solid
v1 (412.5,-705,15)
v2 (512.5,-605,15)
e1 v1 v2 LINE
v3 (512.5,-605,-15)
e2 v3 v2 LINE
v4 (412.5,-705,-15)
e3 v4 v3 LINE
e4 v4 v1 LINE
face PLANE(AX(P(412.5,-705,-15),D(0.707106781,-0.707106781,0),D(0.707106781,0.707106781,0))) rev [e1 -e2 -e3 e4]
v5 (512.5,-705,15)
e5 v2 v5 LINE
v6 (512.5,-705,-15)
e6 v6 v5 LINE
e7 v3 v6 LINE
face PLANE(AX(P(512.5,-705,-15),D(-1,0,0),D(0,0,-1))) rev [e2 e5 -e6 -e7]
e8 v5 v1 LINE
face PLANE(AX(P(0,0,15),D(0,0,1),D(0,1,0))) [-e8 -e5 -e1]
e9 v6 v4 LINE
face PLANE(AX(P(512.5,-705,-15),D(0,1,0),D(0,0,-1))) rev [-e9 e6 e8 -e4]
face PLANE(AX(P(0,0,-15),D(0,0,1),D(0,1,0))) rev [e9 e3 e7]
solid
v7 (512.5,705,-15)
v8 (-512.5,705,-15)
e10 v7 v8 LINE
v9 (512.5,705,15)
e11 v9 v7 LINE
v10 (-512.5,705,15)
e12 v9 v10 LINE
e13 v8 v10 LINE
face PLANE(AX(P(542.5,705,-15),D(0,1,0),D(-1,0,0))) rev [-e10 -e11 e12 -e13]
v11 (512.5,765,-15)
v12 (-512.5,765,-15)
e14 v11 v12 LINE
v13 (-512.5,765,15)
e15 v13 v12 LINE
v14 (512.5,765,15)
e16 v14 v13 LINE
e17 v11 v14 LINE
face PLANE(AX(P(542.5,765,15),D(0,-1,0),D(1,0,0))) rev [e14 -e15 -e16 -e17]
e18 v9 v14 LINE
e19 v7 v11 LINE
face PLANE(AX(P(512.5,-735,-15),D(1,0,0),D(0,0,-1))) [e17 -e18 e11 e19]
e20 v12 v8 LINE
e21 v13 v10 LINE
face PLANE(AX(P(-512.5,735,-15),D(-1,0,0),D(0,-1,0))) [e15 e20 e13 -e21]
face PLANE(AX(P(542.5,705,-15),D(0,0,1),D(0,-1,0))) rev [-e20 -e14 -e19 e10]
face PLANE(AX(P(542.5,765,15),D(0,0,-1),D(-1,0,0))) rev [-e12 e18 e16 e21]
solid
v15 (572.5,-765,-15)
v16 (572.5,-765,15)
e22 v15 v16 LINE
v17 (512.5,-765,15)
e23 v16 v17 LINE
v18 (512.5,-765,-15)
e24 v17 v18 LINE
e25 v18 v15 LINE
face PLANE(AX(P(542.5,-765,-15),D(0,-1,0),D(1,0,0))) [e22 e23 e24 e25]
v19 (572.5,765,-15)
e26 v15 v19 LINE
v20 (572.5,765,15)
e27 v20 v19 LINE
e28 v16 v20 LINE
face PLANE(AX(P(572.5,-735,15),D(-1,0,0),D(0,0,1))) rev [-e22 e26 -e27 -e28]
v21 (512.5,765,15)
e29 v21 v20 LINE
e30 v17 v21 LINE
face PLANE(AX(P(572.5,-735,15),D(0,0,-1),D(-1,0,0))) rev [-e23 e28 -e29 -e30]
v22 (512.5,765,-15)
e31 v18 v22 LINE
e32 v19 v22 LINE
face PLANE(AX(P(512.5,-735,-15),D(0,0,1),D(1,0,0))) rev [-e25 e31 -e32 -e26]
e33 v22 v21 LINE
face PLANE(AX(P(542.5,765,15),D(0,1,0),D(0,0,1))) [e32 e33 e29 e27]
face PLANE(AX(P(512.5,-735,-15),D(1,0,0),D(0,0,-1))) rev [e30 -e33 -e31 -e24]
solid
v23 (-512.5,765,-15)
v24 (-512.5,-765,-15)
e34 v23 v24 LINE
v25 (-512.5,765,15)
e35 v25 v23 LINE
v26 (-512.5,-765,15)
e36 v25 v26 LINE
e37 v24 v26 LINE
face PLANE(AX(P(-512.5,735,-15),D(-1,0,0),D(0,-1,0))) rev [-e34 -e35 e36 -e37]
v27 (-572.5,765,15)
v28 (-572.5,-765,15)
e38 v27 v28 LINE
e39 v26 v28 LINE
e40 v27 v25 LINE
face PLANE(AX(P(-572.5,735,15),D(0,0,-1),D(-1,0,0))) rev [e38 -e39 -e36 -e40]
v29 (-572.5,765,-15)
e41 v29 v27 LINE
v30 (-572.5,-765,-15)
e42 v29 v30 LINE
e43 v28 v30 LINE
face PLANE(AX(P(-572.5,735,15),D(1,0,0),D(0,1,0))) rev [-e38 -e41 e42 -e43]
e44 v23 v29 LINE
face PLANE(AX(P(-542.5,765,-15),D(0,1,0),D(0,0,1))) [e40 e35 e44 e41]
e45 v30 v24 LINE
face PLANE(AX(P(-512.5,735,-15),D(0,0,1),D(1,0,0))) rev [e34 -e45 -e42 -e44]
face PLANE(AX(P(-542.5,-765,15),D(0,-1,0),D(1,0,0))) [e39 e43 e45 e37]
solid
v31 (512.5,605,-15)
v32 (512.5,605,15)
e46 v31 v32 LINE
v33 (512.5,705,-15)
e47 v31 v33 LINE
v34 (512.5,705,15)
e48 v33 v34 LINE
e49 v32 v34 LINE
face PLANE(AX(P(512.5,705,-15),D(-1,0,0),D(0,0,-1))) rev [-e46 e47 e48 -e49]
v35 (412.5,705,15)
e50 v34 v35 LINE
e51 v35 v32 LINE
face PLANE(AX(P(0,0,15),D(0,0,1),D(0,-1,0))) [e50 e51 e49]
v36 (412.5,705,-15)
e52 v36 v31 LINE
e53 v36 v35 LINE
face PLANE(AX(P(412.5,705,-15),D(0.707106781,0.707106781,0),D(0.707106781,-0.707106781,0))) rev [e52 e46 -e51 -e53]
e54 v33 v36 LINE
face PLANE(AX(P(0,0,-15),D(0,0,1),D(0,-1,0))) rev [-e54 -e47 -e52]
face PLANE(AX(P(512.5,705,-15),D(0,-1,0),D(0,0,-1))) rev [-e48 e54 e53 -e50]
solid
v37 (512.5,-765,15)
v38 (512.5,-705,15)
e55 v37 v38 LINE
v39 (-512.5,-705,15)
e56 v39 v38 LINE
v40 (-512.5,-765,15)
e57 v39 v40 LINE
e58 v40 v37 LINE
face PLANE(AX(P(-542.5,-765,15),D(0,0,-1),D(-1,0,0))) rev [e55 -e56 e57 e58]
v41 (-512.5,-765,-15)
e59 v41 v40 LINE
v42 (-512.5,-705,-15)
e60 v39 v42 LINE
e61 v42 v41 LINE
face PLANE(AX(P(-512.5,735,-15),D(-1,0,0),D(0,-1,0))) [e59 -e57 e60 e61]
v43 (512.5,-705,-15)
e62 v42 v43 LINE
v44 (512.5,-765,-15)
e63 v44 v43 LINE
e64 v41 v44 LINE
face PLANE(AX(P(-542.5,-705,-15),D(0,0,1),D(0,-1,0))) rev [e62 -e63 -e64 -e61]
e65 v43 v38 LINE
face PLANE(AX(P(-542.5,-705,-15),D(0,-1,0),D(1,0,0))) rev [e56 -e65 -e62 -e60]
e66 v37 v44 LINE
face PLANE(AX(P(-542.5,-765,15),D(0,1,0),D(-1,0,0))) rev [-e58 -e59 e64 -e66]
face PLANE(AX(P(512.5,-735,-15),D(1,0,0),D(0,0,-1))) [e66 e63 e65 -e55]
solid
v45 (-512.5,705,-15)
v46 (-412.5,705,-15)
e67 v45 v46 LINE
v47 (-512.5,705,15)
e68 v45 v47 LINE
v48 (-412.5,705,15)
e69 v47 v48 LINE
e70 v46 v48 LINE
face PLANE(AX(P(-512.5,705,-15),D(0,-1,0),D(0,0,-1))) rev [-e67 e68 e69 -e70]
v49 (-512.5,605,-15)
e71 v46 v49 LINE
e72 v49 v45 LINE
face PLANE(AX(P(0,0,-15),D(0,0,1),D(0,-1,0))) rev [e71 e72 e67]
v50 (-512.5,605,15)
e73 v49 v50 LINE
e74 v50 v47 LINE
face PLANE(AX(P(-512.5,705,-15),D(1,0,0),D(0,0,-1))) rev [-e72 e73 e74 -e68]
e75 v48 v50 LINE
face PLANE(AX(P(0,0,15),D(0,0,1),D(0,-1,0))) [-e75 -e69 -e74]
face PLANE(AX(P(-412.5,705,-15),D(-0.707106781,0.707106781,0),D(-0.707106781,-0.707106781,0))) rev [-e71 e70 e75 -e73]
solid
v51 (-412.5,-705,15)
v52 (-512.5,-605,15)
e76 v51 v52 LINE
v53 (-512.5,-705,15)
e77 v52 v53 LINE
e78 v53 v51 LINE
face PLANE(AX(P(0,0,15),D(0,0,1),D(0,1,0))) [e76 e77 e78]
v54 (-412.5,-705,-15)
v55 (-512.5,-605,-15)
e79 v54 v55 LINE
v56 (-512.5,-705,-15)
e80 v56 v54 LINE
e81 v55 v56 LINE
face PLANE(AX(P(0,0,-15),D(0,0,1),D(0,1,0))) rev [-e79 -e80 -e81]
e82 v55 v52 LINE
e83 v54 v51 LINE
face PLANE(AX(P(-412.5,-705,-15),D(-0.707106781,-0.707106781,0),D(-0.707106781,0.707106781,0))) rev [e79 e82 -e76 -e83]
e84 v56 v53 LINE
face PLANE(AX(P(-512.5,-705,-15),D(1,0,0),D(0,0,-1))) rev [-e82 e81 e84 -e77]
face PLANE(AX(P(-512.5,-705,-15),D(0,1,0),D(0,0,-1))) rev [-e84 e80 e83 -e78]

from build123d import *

# Parameters (mm, degrees)
MEMBER_START                 = -765
MEMBER_20_X_20_1_OUTLINE_W   = 60
MEMBER_20_X_20_1_OUTLINE_H   = 30
MEMBER_20_X_20_1_DEPTH       = 1530
MEMBER_20_X_20_1_2_OUTLINE_W = 1025
MEMBER_20_X_20_1_2_OUTLINE_H = 30
MEMBER_20_X_20_1_2_DEPTH     = 60
MEMBER_START_2               = 705
MEMBER_20_X_20_1_3_OUTLINE_W = 1025
MEMBER_20_X_20_1_3_OUTLINE_H = 30
MEMBER_20_X_20_1_3_DEPTH     = 60
GUSSET_1_THICKNESS           = 30


# Read off the part's stored shape, not the designer's step: Квадрат 20 X 20(1)
with BuildPart() as part:
    # Member 20 X 20_1 outline → Member 20 X 20_1 (new body)
    with BuildSketch(Plane(origin=(0, 0, 0), x_dir=(1, 0, 0), z_dir=(0, 1, 0)).offset(MEMBER_START)):
        with Locations((542.5, 0)):
            Rectangle(MEMBER_20_X_20_1_OUTLINE_W, MEMBER_20_X_20_1_OUTLINE_H)
        with Locations((-542.5, 0)):
            Rectangle(MEMBER_20_X_20_1_OUTLINE_W, MEMBER_20_X_20_1_OUTLINE_H)
    extrude(amount=MEMBER_20_X_20_1_DEPTH)


with BuildPart() as body_2:
    # Member 20 X 20_1 2 outline → Member 20 X 20_1 2 (new body)
    with BuildSketch(Plane(origin=(0, 0, 0), x_dir=(1, 0, 0), z_dir=(0, 1, 0)).offset(MEMBER_START)):
        Rectangle(MEMBER_20_X_20_1_2_OUTLINE_W, MEMBER_20_X_20_1_2_OUTLINE_H)
    extrude(amount=MEMBER_20_X_20_1_2_DEPTH)


with BuildPart() as body_3:
    # Member 20 X 20_1 3 outline → Member 20 X 20_1 3 (new body)
    with BuildSketch(Plane(origin=(0, 0, 0), x_dir=(1, 0, 0), z_dir=(0, 1, 0)).offset(MEMBER_START_2)):
        Rectangle(MEMBER_20_X_20_1_3_OUTLINE_W, MEMBER_20_X_20_1_3_OUTLINE_H)
    extrude(amount=MEMBER_20_X_20_1_3_DEPTH)


with BuildPart() as body_4:
    # Gusset 1: a gusset: a plate 30.0 thick in the corner of two members, its outline drawn in place
    gusset_1_outline = Wire([Line((-512.5, 705, -15), (-412.5, 705, -15)), Line((-412.5, 705, -15), (-512.5, 605, -15)), Line((-512.5, 605, -15), (-512.5, 705, -15))])
    add(extrude(Face(gusset_1_outline), amount=GUSSET_1_THICKNESS, dir=(0, 0, 1)))


with BuildPart() as body_5:
    # Зеркальное отражение2: mirrored copy
    add(body_4.part.mirror(Plane(origin=(0, 0, 0), x_dir=(0, 0, 1), z_dir=(1, 0, 0))))


with BuildPart() as body_6:
    # Зеркальное отражение3: mirrored copy
    add(body_4.part.mirror(Plane.ZX))


with BuildPart() as body_7:
    # Mirror 3 2: mirrored copy
    add(body_5.part.mirror(Plane.ZX))


solid = Compound([part.part, body_2.part, body_3.part, body_4.part, body_5.part, body_6.part, body_7.part])
